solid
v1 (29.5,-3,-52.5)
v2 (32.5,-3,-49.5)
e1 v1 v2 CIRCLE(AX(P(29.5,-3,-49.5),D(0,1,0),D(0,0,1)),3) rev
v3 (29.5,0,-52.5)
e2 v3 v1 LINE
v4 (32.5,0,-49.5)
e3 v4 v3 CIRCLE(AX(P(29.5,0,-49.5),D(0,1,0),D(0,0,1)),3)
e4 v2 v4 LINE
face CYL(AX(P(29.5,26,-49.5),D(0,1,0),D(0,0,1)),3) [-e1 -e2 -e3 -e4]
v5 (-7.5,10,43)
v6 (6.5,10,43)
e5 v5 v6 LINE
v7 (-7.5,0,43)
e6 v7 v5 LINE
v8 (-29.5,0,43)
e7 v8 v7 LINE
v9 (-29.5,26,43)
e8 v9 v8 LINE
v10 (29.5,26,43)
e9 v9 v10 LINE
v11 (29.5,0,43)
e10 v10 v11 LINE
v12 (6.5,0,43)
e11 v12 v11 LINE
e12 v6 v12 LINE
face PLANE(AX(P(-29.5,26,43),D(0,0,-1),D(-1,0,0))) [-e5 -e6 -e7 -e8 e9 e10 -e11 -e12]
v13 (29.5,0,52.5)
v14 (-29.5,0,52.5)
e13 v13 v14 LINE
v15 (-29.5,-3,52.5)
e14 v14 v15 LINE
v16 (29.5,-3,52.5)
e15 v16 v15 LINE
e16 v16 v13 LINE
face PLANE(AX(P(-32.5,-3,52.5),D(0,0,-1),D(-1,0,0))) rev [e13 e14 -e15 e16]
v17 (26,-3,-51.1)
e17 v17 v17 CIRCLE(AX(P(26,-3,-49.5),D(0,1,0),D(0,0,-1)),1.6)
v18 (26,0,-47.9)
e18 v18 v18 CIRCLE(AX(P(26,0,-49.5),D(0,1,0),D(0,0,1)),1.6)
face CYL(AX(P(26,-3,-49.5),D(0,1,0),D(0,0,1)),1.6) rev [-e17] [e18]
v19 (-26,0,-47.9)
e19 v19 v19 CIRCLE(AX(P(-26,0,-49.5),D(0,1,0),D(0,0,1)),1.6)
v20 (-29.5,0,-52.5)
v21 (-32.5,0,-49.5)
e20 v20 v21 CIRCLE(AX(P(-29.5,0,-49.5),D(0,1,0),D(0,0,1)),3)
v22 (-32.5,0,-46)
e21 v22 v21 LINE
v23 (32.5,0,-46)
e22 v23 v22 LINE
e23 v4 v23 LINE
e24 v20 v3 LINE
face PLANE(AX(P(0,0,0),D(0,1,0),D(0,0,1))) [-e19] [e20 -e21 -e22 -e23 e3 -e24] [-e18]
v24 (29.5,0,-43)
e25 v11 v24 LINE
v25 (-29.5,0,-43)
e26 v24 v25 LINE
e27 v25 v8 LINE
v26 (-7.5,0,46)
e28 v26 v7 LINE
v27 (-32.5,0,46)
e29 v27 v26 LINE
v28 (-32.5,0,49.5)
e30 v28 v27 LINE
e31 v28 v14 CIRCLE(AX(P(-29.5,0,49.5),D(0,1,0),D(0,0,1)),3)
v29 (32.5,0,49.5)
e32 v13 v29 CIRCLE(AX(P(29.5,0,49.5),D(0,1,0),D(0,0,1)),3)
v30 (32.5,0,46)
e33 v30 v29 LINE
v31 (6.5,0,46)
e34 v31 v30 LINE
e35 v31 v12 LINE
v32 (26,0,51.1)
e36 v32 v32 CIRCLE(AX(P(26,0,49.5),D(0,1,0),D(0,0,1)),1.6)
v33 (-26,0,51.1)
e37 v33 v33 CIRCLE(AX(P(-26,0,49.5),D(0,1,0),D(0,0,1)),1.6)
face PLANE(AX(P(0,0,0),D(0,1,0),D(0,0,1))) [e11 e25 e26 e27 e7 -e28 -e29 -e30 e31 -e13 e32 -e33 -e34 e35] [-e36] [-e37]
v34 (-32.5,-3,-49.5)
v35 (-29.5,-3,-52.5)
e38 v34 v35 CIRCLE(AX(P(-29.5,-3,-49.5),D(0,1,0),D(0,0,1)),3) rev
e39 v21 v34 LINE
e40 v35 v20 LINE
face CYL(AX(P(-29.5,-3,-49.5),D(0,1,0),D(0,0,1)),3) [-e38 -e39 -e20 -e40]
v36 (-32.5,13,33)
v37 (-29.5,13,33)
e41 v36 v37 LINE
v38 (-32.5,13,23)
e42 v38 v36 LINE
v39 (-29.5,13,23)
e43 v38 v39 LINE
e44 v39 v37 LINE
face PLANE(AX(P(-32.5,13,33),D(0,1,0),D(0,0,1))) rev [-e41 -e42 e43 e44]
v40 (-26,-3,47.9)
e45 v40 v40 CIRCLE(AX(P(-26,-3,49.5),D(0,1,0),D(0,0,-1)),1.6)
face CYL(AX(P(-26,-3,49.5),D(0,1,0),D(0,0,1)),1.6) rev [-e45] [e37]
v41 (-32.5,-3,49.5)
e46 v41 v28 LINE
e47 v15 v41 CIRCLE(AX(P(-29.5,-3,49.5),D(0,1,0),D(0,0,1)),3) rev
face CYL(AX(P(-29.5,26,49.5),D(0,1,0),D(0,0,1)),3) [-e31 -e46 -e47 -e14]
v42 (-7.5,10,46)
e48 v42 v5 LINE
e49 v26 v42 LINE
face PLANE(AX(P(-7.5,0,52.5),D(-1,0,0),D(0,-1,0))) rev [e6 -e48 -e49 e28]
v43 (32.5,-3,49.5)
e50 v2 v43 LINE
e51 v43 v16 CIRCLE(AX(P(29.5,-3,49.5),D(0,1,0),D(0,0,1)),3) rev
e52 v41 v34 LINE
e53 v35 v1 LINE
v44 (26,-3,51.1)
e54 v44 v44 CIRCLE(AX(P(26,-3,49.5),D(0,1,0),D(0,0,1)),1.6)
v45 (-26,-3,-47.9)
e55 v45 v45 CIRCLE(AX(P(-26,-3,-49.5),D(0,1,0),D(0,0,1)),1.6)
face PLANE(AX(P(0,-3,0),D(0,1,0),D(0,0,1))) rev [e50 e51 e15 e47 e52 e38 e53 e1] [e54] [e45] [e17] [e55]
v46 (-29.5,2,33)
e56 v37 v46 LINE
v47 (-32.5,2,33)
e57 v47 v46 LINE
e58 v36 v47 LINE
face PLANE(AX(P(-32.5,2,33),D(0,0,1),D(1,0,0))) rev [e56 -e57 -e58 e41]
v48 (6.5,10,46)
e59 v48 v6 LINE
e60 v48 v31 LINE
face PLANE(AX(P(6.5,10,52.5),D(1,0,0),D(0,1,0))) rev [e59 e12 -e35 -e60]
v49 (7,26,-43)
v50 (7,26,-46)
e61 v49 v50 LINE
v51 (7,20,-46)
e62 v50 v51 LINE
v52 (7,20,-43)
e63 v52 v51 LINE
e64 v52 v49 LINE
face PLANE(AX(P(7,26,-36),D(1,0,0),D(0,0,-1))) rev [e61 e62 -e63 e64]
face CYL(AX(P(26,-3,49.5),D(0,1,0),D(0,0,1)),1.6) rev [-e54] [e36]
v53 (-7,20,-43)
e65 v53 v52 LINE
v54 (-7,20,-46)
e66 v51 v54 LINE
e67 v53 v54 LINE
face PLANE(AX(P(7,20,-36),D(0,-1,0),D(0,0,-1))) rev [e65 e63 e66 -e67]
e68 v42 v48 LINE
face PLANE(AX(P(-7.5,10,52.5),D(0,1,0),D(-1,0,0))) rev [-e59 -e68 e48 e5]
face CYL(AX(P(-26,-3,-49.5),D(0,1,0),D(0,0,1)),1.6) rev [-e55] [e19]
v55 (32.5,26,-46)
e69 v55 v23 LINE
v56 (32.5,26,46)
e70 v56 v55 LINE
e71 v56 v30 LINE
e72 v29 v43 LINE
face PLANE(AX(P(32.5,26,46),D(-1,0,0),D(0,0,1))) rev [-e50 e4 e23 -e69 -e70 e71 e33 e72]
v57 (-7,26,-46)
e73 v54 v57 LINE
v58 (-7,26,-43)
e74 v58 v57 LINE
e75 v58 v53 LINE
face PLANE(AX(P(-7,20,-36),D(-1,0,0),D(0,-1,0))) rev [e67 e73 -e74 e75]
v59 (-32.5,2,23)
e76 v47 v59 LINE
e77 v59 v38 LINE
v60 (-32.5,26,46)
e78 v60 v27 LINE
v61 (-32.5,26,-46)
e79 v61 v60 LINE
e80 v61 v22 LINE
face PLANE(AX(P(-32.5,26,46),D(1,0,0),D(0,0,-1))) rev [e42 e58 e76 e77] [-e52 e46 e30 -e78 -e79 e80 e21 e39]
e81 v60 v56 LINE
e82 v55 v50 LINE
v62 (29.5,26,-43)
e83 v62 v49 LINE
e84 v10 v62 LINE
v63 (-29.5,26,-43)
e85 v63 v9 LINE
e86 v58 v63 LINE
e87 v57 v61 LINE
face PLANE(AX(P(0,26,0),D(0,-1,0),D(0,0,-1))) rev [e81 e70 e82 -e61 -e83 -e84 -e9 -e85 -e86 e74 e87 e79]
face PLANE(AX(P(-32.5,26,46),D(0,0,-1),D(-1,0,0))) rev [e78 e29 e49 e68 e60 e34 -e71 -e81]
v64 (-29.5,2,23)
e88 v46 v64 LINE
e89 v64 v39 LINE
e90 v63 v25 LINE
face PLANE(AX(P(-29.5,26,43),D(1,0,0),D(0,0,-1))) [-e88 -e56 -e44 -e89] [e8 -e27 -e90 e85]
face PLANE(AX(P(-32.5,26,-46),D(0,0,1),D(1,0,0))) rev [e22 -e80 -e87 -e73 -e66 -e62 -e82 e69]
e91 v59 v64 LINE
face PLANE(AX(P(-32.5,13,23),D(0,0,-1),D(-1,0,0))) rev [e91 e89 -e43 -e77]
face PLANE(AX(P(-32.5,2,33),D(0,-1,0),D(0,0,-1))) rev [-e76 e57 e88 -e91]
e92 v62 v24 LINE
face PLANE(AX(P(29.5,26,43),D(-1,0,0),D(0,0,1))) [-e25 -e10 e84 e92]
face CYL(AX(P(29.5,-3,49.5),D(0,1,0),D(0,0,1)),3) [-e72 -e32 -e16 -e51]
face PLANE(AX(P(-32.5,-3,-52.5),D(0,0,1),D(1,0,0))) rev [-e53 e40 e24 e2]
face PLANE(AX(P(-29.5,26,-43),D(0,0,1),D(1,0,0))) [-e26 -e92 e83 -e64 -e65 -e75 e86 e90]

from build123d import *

# Parameters (mm, degrees)
SKETCH_1_W               = 65
SKETCH_1_H               = 92
SKETCH_1_W_2             = 59
SKETCH_1_H_2             = 86
EXTRUDE_1_DEPTH          = 26
SKETCH_2_W               = 65
SKETCH_2_H               = 105
EXTRUDE_2_DEPTH          = 3
CUT_EXTRUDE_1_DEPTH      = 67.996268553
CUT_EXTRUDE_1_DEPTH_BACK = 67.996268553
SKETCH_3_R               = 1.6
FILLET_1_R               = 3
CUT_EXTRUDE_START        = -3
CUT_EXTRUDE_2_OUTLINE_W  = 14
CUT_EXTRUDE_2_OUTLINE_H  = 10
CUT_EXTRUDE_2_DEPTH      = 3
CUT_EXTRUDE_3_OUTLINE_W  = 10
CUT_EXTRUDE_3_OUTLINE_H  = 11
CUT_EXTRUDE_3_DEPTH      = 3
SKETCH_6_W               = 14
SKETCH_6_H               = 6
CUT_EXTRUDE_4_DEPTH      = 10


# Read off the part's stored shape, not the designer's step: 切除-拉伸2, 切除-拉伸3
with BuildPart() as part:
    # 草图1 → 凸台-拉伸1 (new body)
    with BuildSketch(Plane(origin=(0, 0, 0), x_dir=(1, 0, 0), z_dir=(0, 1, 0))):
        Rectangle(SKETCH_1_W, SKETCH_1_H)
        Rectangle(SKETCH_1_W_2, SKETCH_1_H_2, mode=Mode.SUBTRACT)
    extrude(amount=EXTRUDE_1_DEPTH)

    # 草图2 → 凸台-拉伸2 (add)
    with BuildSketch(Plane.XZ):
        Rectangle(SKETCH_2_W, SKETCH_2_H)
    extrude(amount=EXTRUDE_2_DEPTH)

    # 草图3 → 切除-拉伸1 (cut, two sides: drawn at the far end of the back side and taken through both)
    with BuildSketch(Plane(origin=(0, 0, 0), x_dir=(1, 0, 0), z_dir=(0, 1, 0)).offset(-CUT_EXTRUDE_1_DEPTH_BACK)):
        with Locations(Location((-26, 49.5, 0), (0, 0, 270))):
            Circle(SKETCH_3_R)
        with Locations(Location((26, 49.5, 0), (0, 0, 270))):
            Circle(SKETCH_3_R)
        with Locations(Location((26, -49.5, 0), (0, 0, 270))):
            Circle(SKETCH_3_R)
        with Locations(Location((-26, -49.5, 0), (0, 0, 270))):
            Circle(SKETCH_3_R)
    extrude(amount=CUT_EXTRUDE_1_DEPTH + CUT_EXTRUDE_1_DEPTH_BACK, mode=Mode.SUBTRACT)

    # 圆角1
    fillet_1_edges = [part.edges().sort_by_distance(p)[0] for p in [
        (32.5, -1.5, -52.5),
        (32.5, -1.5, 52.5),
        (-32.5, -1.5, 52.5),
        (-32.5, -1.5, -52.5),
    ]]
    fillet(fillet_1_edges, radius=FILLET_1_R)

    # 切除-拉伸2 outline → 切除-拉伸2 (cut)
    with BuildSketch(Plane(origin=(0, 0, 43), x_dir=(-1, 0, 0), z_dir=(0, 0, -1)).offset(CUT_EXTRUDE_START)):
        with Locations((0.5, 5)):
            Rectangle(CUT_EXTRUDE_2_OUTLINE_W, CUT_EXTRUDE_2_OUTLINE_H)
    extrude(amount=CUT_EXTRUDE_2_DEPTH, mode=Mode.SUBTRACT)

    # 切除-拉伸3 outline → 切除-拉伸3 (cut)
    with BuildSketch(Plane(origin=(-29.5, 0, 0), x_dir=(0, 0, -1), z_dir=(1, 0, 0)).offset(CUT_EXTRUDE_START)):
        with Locations((-28, 7.5)):
            Rectangle(CUT_EXTRUDE_3_OUTLINE_W, CUT_EXTRUDE_3_OUTLINE_H)
    extrude(amount=CUT_EXTRUDE_3_DEPTH, mode=Mode.SUBTRACT)

    # 草图6 → 切除-拉伸4 (cut)
    with BuildSketch(Plane(origin=(0, 0, -46), x_dir=(-1, 0, 0), z_dir=(0, 0, -1))):
        with Locations((0, 23)):
            Rectangle(SKETCH_6_W, SKETCH_6_H)
    extrude(amount=-CUT_EXTRUDE_4_DEPTH, mode=Mode.SUBTRACT)


solid = part.part
